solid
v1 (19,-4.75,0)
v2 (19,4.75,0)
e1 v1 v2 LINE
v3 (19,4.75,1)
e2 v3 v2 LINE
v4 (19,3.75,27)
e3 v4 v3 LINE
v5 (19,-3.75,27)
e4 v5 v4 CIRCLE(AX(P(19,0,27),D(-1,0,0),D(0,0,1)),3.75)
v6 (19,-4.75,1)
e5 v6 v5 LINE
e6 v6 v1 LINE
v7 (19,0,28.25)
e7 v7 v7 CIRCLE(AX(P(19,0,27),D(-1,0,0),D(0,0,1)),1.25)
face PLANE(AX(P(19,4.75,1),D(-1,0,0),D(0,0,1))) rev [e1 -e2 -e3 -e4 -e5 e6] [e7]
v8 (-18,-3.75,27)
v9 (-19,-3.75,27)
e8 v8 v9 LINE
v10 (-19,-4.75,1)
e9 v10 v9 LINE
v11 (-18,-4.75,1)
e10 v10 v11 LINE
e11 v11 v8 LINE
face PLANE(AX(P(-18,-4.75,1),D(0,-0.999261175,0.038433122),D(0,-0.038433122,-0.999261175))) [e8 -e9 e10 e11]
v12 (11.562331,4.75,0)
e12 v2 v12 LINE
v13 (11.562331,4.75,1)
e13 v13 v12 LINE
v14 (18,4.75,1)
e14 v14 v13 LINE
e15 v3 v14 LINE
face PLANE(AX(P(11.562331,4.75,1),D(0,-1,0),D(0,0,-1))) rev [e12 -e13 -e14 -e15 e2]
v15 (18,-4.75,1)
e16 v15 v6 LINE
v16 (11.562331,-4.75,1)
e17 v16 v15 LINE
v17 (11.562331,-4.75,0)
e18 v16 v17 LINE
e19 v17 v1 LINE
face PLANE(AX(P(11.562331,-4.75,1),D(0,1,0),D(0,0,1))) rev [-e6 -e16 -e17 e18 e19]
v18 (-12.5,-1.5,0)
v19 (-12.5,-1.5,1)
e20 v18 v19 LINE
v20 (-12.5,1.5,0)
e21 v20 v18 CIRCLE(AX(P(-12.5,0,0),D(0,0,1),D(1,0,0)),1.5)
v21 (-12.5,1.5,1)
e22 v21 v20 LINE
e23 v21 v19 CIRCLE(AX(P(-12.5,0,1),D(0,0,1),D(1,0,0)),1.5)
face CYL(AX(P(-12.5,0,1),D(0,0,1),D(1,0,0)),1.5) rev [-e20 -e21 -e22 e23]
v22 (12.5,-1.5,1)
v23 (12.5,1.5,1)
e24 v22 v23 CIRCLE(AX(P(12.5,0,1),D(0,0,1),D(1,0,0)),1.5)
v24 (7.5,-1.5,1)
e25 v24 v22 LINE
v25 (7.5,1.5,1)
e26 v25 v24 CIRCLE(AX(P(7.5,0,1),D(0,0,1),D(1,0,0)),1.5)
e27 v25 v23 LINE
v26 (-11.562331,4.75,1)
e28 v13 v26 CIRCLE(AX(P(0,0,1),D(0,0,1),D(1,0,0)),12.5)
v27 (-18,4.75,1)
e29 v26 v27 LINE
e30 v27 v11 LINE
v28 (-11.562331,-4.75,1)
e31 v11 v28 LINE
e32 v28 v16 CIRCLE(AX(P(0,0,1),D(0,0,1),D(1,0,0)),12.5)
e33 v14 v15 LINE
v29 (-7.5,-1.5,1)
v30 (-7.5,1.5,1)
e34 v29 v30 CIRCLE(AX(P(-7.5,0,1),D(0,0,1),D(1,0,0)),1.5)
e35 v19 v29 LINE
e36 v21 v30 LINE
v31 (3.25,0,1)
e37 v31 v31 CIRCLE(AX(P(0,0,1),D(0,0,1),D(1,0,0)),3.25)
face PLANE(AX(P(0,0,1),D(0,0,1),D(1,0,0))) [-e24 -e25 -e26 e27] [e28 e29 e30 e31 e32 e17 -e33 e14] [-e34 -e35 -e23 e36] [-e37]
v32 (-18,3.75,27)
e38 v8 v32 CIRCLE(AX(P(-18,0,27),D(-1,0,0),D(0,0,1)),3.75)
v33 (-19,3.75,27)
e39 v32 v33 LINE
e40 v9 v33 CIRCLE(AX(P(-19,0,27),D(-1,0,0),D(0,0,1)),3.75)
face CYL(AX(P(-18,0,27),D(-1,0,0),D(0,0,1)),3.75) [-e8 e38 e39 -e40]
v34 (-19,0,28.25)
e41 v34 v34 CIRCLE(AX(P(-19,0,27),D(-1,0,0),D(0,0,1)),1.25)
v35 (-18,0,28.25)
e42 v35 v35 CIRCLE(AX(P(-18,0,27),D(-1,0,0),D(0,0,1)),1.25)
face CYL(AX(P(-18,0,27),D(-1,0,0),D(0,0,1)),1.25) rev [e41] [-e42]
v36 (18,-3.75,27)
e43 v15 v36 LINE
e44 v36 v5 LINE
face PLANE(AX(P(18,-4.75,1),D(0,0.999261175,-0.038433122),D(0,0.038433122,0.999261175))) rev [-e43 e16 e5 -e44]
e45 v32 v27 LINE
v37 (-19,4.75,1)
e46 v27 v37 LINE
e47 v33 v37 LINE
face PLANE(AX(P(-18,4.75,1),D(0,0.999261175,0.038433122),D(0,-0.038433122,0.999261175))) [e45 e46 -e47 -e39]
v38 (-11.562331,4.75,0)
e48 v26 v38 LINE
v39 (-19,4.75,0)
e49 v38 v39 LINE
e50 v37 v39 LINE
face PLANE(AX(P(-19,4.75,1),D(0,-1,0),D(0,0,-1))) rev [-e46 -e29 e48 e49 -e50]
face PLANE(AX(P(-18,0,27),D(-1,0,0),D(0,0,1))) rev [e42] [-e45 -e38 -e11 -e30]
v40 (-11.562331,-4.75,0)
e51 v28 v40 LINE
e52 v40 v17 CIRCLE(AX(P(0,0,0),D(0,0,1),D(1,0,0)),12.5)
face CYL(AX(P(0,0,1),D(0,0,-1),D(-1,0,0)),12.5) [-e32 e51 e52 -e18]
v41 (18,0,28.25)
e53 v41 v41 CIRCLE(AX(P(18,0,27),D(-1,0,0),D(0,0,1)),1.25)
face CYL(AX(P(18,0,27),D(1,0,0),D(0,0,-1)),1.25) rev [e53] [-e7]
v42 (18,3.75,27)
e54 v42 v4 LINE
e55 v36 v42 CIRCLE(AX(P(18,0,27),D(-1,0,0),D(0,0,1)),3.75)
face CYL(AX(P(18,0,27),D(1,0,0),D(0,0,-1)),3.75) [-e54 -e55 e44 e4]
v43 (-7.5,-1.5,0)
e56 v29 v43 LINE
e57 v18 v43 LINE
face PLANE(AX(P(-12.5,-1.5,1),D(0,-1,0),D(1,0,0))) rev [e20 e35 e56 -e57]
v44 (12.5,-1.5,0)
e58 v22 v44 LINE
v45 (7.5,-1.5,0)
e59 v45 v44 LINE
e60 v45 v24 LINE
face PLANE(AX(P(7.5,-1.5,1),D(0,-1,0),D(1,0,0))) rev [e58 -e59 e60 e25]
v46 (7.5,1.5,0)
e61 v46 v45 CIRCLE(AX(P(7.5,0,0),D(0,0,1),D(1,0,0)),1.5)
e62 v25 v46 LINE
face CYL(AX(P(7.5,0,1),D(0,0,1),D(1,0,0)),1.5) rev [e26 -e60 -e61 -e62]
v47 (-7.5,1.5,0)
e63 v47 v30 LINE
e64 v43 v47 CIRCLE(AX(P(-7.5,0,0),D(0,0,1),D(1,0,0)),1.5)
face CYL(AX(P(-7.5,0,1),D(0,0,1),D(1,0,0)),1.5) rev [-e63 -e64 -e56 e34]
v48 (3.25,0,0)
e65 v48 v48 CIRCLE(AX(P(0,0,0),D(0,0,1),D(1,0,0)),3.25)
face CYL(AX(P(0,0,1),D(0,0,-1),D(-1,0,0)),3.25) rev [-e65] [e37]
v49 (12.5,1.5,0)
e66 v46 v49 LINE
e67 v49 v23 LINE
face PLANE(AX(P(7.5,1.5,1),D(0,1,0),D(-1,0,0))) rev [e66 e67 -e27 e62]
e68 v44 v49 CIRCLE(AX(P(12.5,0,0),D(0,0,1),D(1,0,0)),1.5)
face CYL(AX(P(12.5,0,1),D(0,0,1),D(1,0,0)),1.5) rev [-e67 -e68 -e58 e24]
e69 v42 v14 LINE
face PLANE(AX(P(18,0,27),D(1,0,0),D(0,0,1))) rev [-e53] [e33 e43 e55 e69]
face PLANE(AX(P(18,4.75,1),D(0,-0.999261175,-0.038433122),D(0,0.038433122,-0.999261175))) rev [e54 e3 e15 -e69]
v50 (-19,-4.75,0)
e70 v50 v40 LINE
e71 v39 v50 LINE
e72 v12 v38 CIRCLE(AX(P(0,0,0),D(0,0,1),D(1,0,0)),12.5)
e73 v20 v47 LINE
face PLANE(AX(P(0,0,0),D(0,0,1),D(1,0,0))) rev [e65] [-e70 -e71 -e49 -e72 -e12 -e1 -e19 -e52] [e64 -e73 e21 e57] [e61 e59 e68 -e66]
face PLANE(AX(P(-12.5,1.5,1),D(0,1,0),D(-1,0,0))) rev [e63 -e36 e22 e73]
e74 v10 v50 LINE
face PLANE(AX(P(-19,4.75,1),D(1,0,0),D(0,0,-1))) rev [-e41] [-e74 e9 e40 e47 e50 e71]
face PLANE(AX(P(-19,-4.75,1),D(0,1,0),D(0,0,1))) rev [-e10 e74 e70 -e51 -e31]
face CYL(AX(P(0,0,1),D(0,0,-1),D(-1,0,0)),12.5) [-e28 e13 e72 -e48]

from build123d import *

# Parameters (mm, degrees)
SKETCH_1_R                = 3.25
EXTRUDE_1_DEPTH           = 1
HOLE_WIZARD_3_0_3_1_DEPTH = 1
SKETCH_7_R                = 1.25
EXTRUDE_2_DEPTH           = 1


# Read off the part's stored shape, not the designer's step: Ø3.0 (3) 直径槽口1
with BuildPart() as part:
    # 草图1 → 凸台-拉伸1 (new body)
    with BuildSketch(Plane.XY):
        with BuildLine():
            Line((11.56233108, 4.75), (19, 4.75))
            Line((19, 4.75), (19, -4.75))
            Line((19, -4.75), (11.56233108, -4.75))
            ThreePointArc((11.56233108, -4.75), (0, -12.5), (-11.56233108, -4.75))
            Line((-11.56233108, -4.75), (-19, -4.75))
            Line((-19, -4.75), (-19, 4.75))
            Line((-19, 4.75), (-11.56233108, 4.75))
            ThreePointArc((-11.56233108, 4.75), (0, 12.5), (11.56233108, 4.75))
        make_face()
        Circle(SKETCH_1_R, mode=Mode.SUBTRACT)
    extrude(amount=EXTRUDE_1_DEPTH)

    # Ø3.0 (3) 直径槽口1 outline → Ø3.0 (3) 直径槽口1 (cut)
    with BuildSketch(Plane.XY):
        with BuildLine():
            Line((7.5, -1.5), (12.5, -1.5))
            ThreePointArc((12.5, -1.5), (14, 0), (12.5, 1.5))
            Line((12.5, 1.5), (7.5, 1.5))
            ThreePointArc((7.5, 1.5), (6, 0), (7.5, -1.5))
        make_face()
        with BuildLine():
            ThreePointArc((-7.5, -1.5), (-6, 0), (-7.5, 1.5))
            Line((-7.5, 1.5), (-12.5, 1.5))
            ThreePointArc((-12.5, 1.5), (-14, 0), (-12.5, -1.5))
            Line((-12.5, -1.5), (-7.5, -1.5))
        make_face()
    extrude(amount=HOLE_WIZARD_3_0_3_1_DEPTH, mode=Mode.SUBTRACT)

    # 草图7 → 凸台-拉伸2 (add)
    with BuildSketch(Plane.ZY.offset(19)):
        with BuildLine():
            Line((1, 4.75), (27, 3.75))
            ThreePointArc((27, 3.75), (30.75, 0), (27, -3.75))
            Line((27, -3.75), (1, -4.75))
            Line((1, -4.75), (1, 4.75))
        make_face()
        with Locations((27, 0)):
            Circle(SKETCH_7_R, mode=Mode.SUBTRACT)
    extrude_2 = extrude(amount=-EXTRUDE_2_DEPTH)

    # 镜向1: 凸台-拉伸2 across plane
    add(extrude_2.mirror(Plane(origin=(0, 0, 0), x_dir=(0, 0, 1), z_dir=(1, 0, 0))))


solid = part.part
